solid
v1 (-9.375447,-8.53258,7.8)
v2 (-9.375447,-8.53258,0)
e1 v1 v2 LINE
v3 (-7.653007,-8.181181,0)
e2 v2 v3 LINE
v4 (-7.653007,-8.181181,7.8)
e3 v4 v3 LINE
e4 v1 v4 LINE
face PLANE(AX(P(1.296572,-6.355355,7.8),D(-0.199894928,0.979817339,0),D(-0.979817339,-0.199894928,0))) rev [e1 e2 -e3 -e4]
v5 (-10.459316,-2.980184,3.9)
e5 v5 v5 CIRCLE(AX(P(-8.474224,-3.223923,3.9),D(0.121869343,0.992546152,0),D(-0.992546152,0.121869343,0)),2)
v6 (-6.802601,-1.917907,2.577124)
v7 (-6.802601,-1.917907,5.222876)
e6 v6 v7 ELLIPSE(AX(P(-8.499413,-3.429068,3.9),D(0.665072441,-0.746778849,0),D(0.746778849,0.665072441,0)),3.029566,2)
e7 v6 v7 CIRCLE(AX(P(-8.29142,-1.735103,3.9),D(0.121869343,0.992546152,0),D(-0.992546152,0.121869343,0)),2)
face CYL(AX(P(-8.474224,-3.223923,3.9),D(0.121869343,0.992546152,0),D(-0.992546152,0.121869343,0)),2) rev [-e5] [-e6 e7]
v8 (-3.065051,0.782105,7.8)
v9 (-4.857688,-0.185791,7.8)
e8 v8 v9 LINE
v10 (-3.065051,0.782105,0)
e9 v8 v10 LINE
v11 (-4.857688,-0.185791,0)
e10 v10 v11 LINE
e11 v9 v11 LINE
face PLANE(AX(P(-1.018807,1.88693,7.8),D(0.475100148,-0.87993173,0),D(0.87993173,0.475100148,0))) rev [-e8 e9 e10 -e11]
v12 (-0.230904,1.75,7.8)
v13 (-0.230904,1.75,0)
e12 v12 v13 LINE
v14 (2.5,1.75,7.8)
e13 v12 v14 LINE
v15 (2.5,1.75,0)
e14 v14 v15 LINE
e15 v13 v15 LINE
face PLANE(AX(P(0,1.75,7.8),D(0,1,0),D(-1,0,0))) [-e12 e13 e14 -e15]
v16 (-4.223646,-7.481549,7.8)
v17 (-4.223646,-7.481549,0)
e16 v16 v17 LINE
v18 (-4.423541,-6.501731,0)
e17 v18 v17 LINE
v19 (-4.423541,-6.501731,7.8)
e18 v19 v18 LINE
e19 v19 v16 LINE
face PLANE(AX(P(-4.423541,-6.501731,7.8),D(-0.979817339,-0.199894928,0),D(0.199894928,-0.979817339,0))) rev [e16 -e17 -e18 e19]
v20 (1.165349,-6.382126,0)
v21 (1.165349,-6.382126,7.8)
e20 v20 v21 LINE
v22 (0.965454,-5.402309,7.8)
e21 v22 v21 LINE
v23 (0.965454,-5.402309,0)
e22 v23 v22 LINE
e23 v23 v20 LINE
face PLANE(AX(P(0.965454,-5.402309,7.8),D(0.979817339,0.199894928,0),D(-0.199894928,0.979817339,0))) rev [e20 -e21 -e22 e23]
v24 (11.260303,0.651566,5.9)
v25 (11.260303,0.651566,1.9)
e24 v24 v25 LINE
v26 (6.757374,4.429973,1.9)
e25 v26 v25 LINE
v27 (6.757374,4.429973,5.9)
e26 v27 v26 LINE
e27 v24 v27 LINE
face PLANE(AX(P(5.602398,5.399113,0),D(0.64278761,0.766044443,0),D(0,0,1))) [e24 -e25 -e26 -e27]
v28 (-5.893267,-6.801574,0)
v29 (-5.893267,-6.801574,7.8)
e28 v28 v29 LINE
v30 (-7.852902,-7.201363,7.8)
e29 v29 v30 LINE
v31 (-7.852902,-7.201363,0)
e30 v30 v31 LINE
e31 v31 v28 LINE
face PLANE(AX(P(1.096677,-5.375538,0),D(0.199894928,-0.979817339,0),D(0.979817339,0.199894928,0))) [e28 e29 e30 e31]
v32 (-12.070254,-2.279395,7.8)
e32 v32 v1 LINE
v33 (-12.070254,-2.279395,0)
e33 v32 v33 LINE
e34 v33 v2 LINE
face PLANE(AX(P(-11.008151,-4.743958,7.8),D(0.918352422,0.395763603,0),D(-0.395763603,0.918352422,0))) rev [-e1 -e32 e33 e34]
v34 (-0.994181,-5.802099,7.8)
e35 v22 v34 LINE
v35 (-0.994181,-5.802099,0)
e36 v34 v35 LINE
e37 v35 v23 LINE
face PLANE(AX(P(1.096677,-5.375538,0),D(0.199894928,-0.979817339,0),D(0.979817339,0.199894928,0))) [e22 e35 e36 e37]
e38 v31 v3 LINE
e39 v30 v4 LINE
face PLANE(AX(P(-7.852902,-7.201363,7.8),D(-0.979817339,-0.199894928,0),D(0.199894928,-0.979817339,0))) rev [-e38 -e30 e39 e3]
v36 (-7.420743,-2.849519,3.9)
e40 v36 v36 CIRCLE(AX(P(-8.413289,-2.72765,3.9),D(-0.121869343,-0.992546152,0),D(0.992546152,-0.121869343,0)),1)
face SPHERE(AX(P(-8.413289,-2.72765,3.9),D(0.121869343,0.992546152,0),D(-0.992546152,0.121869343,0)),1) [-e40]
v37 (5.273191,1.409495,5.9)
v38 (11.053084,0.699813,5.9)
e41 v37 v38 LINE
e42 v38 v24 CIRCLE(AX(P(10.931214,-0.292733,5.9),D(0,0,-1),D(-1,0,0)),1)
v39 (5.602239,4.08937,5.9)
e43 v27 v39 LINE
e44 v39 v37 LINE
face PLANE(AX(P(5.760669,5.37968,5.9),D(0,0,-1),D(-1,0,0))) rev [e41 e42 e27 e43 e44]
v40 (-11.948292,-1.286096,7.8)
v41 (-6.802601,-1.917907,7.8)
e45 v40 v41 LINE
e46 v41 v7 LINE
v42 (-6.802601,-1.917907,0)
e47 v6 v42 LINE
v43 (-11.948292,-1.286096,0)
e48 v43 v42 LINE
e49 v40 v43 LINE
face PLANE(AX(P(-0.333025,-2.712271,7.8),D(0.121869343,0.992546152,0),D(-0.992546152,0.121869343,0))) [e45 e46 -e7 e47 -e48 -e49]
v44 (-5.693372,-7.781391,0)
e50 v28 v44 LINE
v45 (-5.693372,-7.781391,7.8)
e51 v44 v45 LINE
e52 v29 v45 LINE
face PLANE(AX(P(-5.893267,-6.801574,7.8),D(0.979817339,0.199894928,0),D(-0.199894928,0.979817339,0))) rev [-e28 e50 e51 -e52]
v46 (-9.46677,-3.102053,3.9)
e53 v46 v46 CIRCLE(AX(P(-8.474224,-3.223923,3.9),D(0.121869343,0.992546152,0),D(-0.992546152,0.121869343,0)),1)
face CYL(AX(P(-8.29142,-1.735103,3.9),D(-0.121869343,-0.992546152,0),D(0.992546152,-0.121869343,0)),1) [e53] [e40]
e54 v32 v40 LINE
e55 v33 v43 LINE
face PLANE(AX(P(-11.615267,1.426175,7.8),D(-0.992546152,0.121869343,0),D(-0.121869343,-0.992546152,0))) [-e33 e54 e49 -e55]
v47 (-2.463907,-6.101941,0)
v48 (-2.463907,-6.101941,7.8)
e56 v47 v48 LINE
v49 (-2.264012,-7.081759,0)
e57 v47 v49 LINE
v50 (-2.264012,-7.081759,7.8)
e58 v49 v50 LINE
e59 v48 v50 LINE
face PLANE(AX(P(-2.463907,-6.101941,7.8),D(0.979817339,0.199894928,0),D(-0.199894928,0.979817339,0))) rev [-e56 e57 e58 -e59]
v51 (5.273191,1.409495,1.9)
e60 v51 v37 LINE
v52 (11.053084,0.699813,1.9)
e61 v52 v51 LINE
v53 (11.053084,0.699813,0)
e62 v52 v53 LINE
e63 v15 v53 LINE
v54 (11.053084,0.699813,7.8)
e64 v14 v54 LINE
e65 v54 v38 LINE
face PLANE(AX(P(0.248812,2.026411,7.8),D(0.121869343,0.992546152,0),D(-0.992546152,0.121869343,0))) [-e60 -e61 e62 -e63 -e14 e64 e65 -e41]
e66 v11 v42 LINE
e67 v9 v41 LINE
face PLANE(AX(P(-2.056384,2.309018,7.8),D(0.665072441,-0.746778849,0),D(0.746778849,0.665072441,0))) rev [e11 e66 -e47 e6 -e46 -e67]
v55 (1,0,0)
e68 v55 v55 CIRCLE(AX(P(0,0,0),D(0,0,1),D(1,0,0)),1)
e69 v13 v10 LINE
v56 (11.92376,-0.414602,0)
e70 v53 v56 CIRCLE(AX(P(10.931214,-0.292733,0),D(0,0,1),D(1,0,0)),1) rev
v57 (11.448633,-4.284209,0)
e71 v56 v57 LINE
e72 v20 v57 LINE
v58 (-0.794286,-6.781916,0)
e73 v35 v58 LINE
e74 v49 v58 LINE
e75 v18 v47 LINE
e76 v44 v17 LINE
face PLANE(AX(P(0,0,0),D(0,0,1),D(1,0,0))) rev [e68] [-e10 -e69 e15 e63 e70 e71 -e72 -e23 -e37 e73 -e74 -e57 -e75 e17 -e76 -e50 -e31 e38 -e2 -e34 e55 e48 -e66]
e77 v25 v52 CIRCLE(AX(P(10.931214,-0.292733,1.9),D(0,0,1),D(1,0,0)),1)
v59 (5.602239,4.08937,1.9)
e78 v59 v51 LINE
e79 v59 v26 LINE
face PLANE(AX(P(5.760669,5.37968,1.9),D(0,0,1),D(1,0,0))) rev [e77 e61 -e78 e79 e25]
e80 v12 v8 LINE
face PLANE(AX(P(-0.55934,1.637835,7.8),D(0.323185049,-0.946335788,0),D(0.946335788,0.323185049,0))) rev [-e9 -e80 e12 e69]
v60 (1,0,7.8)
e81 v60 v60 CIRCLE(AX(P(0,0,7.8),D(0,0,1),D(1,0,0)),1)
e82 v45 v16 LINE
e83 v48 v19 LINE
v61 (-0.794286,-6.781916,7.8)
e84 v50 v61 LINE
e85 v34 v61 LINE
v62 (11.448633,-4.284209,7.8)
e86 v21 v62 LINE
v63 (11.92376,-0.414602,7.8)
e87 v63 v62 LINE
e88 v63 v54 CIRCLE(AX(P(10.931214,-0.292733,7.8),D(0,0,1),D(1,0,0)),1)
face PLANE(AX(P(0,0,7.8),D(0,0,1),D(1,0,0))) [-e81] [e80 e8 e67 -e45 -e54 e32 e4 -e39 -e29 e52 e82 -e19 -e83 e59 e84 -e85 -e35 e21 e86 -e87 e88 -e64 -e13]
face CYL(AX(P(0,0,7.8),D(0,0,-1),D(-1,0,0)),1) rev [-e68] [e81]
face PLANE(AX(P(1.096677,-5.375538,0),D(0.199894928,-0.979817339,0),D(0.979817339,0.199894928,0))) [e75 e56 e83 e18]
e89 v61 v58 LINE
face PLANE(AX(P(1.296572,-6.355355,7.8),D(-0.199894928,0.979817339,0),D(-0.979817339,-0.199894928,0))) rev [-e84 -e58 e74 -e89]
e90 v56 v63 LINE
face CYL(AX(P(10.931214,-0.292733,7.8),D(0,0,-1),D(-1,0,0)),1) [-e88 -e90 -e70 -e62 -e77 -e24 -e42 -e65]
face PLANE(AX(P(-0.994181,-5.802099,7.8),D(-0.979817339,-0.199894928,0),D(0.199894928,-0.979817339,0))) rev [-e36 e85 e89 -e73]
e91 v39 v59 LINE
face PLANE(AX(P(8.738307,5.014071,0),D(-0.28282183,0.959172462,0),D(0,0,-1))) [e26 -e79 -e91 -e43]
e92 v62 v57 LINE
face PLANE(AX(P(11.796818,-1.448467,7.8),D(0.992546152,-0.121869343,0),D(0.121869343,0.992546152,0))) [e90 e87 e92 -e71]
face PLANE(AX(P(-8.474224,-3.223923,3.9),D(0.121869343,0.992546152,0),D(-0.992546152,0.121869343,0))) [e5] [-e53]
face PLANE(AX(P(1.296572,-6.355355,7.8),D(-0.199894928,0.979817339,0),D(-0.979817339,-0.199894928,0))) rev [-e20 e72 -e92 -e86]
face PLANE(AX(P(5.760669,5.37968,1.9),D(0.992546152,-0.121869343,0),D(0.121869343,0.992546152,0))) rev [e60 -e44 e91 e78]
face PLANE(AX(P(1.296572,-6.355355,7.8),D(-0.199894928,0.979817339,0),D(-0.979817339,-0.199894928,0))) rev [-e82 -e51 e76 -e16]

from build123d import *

# Parameters (mm, degrees)
SKETCH_2_R          = 1
EXTRUDE_2_DEPTH     = 7.8
SKETCH_3_W          = 6
SKETCH_3_H          = 4
EXTRUDE_3_DEPTH     = 4
CHAMFER_1_SIZE      = 1.3
CHAMFER_1_SIZE2     = 3
CHAMFER_2_SIZE      = 6.159459855
CHAMFER_2_SIZE_2    = 4
SKETCH_4_R          = 2
CUT_EXTRUDE_1_DEPTH = 1.5
SKETCH_5_R          = 1
EXTRUDE_4_DEPTH     = 1.5
FILLET_1_R          = 1
SKETCH_6_W          = 2
SKETCH_6_H          = 7.8
CUT_EXTRUDE_2_DEPTH = 1
FILLET_START        = -1
FILLET_2_DEPTH      = 10
FILLET_2_2_DEPTH    = 2.9
FILLET_START_2      = 5.9
FILLET_2_3_DEPTH    = 3.1


with BuildPart() as part:
    # 스케치2 → 보스-돌출2 (new body)
    with BuildSketch(Plane.XY):
        Polygon((2.5, 1.75), (12.045629808, 0.577944035), (11.448632524, -4.284208661), (-9.375446541, -8.532579884), (-12.070254037, -2.279394966), (-11.94829225, -1.286095926), (-6.802600831, -1.917907388), (-4.857687993, -0.185790939), (-3.065051347, 0.78210453), (-0.230903775, 1.75), align=None)
        Circle(SKETCH_2_R, mode=Mode.SUBTRACT)
    extrude(amount=EXTRUDE_2_DEPTH)

    # 스케치3 → 보스-돌출3 (add)
    with BuildSketch(Plane(origin=(0.248812001, 2.02641113, 0), x_dir=(0.9925461516413224, -0.12186934340514406, 0), z_dir=(0.12186934340514406, 0.9925461516413224, 0))):
        with Locations((8.062111671, -3.9)):
            Rectangle(SKETCH_3_W, SKETCH_3_H)
    extrude(amount=EXTRUDE_3_DEPTH)

    # 모따기1
    chamfer_1_edges = [part.edges().sort_by_distance(p)[0] for p in [
        (5.760668833, 5.379679511, 3.9),
    ]]
    chamfer_1_side = [part.faces().sort_by_distance(p)[0] for p in [
        (5.516930146, 3.394587208, 3.9),
    ]]
    chamfer(chamfer_1_edges, length=CHAMFER_1_SIZE, length2=CHAMFER_1_SIZE2, reference=chamfer_1_side[0])

    # 모따기2
    # the kernel refuses this chamfer: 6.159459855, 4 mm, written as the material it takes off along each edge
    with BuildSketch(Plane(origin=(9.288459468, -15.121825718, 5.9), x_dir=(-0.9925461516413224, 0.12186934340514405, 0), z_dir=(0.12186934340514406, 0.9925461516413224, 0))) as chamfer_2_piece_1_section:
        Polygon((CHAMFER_2_SIZE, 0), (0, -CHAMFER_2_SIZE_2), (0, 0), align=None)
    chamfer_2_piece_1 = extrude(amount=35.837521179, mode=Mode.PRIVATE)
    chamfer_2_piece_1 = split(chamfer_2_piece_1, bisect_by=Plane(origin=(17.870057149, -4.894675852, 5.9), z_dir=(0.6427876096865351, 0.7660444431189816, 0)), keep=Keep.TOP, mode=Mode.PRIVATE)
    add(chamfer_2_piece_1, mode=Mode.SUBTRACT)
    with BuildSketch(Plane(origin=(9.288459468, -15.121825718, 1.9), x_dir=(-0.9925461516413225, 0.12186934340514408, 0), z_dir=(0.12186934340514406, 0.9925461516413224, 0))) as chamfer_2_piece_2_section:
        Polygon((CHAMFER_2_SIZE, 0), (0, CHAMFER_2_SIZE_2), (0, 0), align=None)
    chamfer_2_piece_2 = extrude(amount=35.837521179, mode=Mode.PRIVATE)
    chamfer_2_piece_2 = split(chamfer_2_piece_2, bisect_by=Plane(origin=(17.870057149, -4.894675852, 1.9), z_dir=(0.6427876096865351, 0.7660444431189816, 0)), keep=Keep.TOP, mode=Mode.PRIVATE)
    add(chamfer_2_piece_2, mode=Mode.SUBTRACT)
    with BuildSketch(Plane(origin=(11.715945743, 4.648463451, -14.01876059), x_dir=(-0.9925461516413225, 0.1218693434051441, 0), z_dir=(0, 0, 1))) as chamfer_2_piece_3:
        Polygon((CHAMFER_2_SIZE, 0), (0, CHAMFER_2_SIZE_2), (0, 0), align=None)
    extrude(amount=35.837521179, mode=Mode.SUBTRACT)

    # 스케치4 → 컷-돌출1 (cut, symmetric)
    with BuildSketch(Plane(origin=(-0.333025054, -2.712271409, 0), x_dir=(0.9925461516413224, -0.12186934340514398, 0), z_dir=(0.12186934340514398, 0.9925461516413224, 0))):
        with Locations(Location((-8.018161162, -3.9, 0), (0, 0, 180))):
            Circle(SKETCH_4_R)
    extrude(amount=CUT_EXTRUDE_1_DEPTH, both=True, mode=Mode.SUBTRACT)

    # 스케치5 → 보스-돌출4 (add)
    with BuildSketch(Plane(origin=(-0.515829069, -4.201090636, 0), x_dir=(0.9925461516413224, -0.12186934340514398, 0), z_dir=(0.12186934340514398, 0.9925461516413224, 0))):
        with Locations(Location((-8.018161162, -3.9, 0), (0, 0, 180))):
            Circle(SKETCH_5_R)
    extrude(amount=EXTRUDE_4_DEPTH)

    # 필렛1
    fillet_1_edges = [part.edges().sort_by_distance(p)[0] for p in [
        (-7.298873907, -1.856972716, 3.9),
    ]]
    fillet(fillet_1_edges, radius=FILLET_1_R)

    # 스케치6 → 컷-돌출2 (cut)
    with BuildSketch(Plane(origin=(1.296571576, -6.355355406, 0), x_dir=(0.9798173389697206, 0.19989492803544545, 0), z_dir=(0.19989492803544545, -0.9798173389697206, 0))):
        with Locations((-8.133925678, 3.9)):
            Rectangle(SKETCH_6_W, SKETCH_6_H)
        with Locations((-4.633925678, 3.9)):
            Rectangle(SKETCH_6_W, SKETCH_6_H)
        with Locations((-1.133925678, 3.9)):
            Rectangle(SKETCH_6_W, SKETCH_6_H)
    extrude(amount=-CUT_EXTRUDE_2_DEPTH, mode=Mode.SUBTRACT)

    # 필렛2: read off the stored shape, not the designer's step
    # 필렛2 outline → 필렛2 (cut)
    with BuildSketch(Plane.XY.offset(FILLET_START)):
        with BuildLine():
            Line((11.228468369, 0.678278844), (11.260303349, 0.651566124))
            ThreePointArc((11.260303349, 0.651566124), (11.780248218, 0.235605593), (11.923760465, -0.414602116))
            Line((11.923760465, -0.414602116), (12.045629808, 0.577944035))
            Line((12.045629808, 0.577944035), (11.228468369, 0.678278844))
        make_face()
    extrude(amount=FILLET_2_DEPTH, mode=Mode.SUBTRACT)

    # Fillet 2 2 outline → Fillet 2 2 (cut)
    with BuildSketch(Plane.XY.offset(FILLET_START)):
        with BuildLine():
            Line((11.228468369, 0.678278844), (11.053083657, 0.699813379))
            ThreePointArc((11.053083657, 0.699813379), (11.157980304, 0.6812165), (11.260303349, 0.651566124))
            Line((11.260303349, 0.651566124), (11.228468369, 0.678278844))
        make_face()
    extrude(amount=FILLET_2_2_DEPTH, mode=Mode.SUBTRACT)

    # Fillet 2 3 outline → Fillet 2 3 (cut)
    with BuildSketch(Plane.XY.offset(FILLET_START_2)):
        with BuildLine():
            Line((11.228468369, 0.678278844), (11.053083657, 0.699813379))
            ThreePointArc((11.053083657, 0.699813379), (11.157980304, 0.6812165), (11.260303349, 0.651566124))
            Line((11.260303349, 0.651566124), (11.228468369, 0.678278844))
        make_face()
    extrude(amount=FILLET_2_3_DEPTH, mode=Mode.SUBTRACT)


solid = part.part
